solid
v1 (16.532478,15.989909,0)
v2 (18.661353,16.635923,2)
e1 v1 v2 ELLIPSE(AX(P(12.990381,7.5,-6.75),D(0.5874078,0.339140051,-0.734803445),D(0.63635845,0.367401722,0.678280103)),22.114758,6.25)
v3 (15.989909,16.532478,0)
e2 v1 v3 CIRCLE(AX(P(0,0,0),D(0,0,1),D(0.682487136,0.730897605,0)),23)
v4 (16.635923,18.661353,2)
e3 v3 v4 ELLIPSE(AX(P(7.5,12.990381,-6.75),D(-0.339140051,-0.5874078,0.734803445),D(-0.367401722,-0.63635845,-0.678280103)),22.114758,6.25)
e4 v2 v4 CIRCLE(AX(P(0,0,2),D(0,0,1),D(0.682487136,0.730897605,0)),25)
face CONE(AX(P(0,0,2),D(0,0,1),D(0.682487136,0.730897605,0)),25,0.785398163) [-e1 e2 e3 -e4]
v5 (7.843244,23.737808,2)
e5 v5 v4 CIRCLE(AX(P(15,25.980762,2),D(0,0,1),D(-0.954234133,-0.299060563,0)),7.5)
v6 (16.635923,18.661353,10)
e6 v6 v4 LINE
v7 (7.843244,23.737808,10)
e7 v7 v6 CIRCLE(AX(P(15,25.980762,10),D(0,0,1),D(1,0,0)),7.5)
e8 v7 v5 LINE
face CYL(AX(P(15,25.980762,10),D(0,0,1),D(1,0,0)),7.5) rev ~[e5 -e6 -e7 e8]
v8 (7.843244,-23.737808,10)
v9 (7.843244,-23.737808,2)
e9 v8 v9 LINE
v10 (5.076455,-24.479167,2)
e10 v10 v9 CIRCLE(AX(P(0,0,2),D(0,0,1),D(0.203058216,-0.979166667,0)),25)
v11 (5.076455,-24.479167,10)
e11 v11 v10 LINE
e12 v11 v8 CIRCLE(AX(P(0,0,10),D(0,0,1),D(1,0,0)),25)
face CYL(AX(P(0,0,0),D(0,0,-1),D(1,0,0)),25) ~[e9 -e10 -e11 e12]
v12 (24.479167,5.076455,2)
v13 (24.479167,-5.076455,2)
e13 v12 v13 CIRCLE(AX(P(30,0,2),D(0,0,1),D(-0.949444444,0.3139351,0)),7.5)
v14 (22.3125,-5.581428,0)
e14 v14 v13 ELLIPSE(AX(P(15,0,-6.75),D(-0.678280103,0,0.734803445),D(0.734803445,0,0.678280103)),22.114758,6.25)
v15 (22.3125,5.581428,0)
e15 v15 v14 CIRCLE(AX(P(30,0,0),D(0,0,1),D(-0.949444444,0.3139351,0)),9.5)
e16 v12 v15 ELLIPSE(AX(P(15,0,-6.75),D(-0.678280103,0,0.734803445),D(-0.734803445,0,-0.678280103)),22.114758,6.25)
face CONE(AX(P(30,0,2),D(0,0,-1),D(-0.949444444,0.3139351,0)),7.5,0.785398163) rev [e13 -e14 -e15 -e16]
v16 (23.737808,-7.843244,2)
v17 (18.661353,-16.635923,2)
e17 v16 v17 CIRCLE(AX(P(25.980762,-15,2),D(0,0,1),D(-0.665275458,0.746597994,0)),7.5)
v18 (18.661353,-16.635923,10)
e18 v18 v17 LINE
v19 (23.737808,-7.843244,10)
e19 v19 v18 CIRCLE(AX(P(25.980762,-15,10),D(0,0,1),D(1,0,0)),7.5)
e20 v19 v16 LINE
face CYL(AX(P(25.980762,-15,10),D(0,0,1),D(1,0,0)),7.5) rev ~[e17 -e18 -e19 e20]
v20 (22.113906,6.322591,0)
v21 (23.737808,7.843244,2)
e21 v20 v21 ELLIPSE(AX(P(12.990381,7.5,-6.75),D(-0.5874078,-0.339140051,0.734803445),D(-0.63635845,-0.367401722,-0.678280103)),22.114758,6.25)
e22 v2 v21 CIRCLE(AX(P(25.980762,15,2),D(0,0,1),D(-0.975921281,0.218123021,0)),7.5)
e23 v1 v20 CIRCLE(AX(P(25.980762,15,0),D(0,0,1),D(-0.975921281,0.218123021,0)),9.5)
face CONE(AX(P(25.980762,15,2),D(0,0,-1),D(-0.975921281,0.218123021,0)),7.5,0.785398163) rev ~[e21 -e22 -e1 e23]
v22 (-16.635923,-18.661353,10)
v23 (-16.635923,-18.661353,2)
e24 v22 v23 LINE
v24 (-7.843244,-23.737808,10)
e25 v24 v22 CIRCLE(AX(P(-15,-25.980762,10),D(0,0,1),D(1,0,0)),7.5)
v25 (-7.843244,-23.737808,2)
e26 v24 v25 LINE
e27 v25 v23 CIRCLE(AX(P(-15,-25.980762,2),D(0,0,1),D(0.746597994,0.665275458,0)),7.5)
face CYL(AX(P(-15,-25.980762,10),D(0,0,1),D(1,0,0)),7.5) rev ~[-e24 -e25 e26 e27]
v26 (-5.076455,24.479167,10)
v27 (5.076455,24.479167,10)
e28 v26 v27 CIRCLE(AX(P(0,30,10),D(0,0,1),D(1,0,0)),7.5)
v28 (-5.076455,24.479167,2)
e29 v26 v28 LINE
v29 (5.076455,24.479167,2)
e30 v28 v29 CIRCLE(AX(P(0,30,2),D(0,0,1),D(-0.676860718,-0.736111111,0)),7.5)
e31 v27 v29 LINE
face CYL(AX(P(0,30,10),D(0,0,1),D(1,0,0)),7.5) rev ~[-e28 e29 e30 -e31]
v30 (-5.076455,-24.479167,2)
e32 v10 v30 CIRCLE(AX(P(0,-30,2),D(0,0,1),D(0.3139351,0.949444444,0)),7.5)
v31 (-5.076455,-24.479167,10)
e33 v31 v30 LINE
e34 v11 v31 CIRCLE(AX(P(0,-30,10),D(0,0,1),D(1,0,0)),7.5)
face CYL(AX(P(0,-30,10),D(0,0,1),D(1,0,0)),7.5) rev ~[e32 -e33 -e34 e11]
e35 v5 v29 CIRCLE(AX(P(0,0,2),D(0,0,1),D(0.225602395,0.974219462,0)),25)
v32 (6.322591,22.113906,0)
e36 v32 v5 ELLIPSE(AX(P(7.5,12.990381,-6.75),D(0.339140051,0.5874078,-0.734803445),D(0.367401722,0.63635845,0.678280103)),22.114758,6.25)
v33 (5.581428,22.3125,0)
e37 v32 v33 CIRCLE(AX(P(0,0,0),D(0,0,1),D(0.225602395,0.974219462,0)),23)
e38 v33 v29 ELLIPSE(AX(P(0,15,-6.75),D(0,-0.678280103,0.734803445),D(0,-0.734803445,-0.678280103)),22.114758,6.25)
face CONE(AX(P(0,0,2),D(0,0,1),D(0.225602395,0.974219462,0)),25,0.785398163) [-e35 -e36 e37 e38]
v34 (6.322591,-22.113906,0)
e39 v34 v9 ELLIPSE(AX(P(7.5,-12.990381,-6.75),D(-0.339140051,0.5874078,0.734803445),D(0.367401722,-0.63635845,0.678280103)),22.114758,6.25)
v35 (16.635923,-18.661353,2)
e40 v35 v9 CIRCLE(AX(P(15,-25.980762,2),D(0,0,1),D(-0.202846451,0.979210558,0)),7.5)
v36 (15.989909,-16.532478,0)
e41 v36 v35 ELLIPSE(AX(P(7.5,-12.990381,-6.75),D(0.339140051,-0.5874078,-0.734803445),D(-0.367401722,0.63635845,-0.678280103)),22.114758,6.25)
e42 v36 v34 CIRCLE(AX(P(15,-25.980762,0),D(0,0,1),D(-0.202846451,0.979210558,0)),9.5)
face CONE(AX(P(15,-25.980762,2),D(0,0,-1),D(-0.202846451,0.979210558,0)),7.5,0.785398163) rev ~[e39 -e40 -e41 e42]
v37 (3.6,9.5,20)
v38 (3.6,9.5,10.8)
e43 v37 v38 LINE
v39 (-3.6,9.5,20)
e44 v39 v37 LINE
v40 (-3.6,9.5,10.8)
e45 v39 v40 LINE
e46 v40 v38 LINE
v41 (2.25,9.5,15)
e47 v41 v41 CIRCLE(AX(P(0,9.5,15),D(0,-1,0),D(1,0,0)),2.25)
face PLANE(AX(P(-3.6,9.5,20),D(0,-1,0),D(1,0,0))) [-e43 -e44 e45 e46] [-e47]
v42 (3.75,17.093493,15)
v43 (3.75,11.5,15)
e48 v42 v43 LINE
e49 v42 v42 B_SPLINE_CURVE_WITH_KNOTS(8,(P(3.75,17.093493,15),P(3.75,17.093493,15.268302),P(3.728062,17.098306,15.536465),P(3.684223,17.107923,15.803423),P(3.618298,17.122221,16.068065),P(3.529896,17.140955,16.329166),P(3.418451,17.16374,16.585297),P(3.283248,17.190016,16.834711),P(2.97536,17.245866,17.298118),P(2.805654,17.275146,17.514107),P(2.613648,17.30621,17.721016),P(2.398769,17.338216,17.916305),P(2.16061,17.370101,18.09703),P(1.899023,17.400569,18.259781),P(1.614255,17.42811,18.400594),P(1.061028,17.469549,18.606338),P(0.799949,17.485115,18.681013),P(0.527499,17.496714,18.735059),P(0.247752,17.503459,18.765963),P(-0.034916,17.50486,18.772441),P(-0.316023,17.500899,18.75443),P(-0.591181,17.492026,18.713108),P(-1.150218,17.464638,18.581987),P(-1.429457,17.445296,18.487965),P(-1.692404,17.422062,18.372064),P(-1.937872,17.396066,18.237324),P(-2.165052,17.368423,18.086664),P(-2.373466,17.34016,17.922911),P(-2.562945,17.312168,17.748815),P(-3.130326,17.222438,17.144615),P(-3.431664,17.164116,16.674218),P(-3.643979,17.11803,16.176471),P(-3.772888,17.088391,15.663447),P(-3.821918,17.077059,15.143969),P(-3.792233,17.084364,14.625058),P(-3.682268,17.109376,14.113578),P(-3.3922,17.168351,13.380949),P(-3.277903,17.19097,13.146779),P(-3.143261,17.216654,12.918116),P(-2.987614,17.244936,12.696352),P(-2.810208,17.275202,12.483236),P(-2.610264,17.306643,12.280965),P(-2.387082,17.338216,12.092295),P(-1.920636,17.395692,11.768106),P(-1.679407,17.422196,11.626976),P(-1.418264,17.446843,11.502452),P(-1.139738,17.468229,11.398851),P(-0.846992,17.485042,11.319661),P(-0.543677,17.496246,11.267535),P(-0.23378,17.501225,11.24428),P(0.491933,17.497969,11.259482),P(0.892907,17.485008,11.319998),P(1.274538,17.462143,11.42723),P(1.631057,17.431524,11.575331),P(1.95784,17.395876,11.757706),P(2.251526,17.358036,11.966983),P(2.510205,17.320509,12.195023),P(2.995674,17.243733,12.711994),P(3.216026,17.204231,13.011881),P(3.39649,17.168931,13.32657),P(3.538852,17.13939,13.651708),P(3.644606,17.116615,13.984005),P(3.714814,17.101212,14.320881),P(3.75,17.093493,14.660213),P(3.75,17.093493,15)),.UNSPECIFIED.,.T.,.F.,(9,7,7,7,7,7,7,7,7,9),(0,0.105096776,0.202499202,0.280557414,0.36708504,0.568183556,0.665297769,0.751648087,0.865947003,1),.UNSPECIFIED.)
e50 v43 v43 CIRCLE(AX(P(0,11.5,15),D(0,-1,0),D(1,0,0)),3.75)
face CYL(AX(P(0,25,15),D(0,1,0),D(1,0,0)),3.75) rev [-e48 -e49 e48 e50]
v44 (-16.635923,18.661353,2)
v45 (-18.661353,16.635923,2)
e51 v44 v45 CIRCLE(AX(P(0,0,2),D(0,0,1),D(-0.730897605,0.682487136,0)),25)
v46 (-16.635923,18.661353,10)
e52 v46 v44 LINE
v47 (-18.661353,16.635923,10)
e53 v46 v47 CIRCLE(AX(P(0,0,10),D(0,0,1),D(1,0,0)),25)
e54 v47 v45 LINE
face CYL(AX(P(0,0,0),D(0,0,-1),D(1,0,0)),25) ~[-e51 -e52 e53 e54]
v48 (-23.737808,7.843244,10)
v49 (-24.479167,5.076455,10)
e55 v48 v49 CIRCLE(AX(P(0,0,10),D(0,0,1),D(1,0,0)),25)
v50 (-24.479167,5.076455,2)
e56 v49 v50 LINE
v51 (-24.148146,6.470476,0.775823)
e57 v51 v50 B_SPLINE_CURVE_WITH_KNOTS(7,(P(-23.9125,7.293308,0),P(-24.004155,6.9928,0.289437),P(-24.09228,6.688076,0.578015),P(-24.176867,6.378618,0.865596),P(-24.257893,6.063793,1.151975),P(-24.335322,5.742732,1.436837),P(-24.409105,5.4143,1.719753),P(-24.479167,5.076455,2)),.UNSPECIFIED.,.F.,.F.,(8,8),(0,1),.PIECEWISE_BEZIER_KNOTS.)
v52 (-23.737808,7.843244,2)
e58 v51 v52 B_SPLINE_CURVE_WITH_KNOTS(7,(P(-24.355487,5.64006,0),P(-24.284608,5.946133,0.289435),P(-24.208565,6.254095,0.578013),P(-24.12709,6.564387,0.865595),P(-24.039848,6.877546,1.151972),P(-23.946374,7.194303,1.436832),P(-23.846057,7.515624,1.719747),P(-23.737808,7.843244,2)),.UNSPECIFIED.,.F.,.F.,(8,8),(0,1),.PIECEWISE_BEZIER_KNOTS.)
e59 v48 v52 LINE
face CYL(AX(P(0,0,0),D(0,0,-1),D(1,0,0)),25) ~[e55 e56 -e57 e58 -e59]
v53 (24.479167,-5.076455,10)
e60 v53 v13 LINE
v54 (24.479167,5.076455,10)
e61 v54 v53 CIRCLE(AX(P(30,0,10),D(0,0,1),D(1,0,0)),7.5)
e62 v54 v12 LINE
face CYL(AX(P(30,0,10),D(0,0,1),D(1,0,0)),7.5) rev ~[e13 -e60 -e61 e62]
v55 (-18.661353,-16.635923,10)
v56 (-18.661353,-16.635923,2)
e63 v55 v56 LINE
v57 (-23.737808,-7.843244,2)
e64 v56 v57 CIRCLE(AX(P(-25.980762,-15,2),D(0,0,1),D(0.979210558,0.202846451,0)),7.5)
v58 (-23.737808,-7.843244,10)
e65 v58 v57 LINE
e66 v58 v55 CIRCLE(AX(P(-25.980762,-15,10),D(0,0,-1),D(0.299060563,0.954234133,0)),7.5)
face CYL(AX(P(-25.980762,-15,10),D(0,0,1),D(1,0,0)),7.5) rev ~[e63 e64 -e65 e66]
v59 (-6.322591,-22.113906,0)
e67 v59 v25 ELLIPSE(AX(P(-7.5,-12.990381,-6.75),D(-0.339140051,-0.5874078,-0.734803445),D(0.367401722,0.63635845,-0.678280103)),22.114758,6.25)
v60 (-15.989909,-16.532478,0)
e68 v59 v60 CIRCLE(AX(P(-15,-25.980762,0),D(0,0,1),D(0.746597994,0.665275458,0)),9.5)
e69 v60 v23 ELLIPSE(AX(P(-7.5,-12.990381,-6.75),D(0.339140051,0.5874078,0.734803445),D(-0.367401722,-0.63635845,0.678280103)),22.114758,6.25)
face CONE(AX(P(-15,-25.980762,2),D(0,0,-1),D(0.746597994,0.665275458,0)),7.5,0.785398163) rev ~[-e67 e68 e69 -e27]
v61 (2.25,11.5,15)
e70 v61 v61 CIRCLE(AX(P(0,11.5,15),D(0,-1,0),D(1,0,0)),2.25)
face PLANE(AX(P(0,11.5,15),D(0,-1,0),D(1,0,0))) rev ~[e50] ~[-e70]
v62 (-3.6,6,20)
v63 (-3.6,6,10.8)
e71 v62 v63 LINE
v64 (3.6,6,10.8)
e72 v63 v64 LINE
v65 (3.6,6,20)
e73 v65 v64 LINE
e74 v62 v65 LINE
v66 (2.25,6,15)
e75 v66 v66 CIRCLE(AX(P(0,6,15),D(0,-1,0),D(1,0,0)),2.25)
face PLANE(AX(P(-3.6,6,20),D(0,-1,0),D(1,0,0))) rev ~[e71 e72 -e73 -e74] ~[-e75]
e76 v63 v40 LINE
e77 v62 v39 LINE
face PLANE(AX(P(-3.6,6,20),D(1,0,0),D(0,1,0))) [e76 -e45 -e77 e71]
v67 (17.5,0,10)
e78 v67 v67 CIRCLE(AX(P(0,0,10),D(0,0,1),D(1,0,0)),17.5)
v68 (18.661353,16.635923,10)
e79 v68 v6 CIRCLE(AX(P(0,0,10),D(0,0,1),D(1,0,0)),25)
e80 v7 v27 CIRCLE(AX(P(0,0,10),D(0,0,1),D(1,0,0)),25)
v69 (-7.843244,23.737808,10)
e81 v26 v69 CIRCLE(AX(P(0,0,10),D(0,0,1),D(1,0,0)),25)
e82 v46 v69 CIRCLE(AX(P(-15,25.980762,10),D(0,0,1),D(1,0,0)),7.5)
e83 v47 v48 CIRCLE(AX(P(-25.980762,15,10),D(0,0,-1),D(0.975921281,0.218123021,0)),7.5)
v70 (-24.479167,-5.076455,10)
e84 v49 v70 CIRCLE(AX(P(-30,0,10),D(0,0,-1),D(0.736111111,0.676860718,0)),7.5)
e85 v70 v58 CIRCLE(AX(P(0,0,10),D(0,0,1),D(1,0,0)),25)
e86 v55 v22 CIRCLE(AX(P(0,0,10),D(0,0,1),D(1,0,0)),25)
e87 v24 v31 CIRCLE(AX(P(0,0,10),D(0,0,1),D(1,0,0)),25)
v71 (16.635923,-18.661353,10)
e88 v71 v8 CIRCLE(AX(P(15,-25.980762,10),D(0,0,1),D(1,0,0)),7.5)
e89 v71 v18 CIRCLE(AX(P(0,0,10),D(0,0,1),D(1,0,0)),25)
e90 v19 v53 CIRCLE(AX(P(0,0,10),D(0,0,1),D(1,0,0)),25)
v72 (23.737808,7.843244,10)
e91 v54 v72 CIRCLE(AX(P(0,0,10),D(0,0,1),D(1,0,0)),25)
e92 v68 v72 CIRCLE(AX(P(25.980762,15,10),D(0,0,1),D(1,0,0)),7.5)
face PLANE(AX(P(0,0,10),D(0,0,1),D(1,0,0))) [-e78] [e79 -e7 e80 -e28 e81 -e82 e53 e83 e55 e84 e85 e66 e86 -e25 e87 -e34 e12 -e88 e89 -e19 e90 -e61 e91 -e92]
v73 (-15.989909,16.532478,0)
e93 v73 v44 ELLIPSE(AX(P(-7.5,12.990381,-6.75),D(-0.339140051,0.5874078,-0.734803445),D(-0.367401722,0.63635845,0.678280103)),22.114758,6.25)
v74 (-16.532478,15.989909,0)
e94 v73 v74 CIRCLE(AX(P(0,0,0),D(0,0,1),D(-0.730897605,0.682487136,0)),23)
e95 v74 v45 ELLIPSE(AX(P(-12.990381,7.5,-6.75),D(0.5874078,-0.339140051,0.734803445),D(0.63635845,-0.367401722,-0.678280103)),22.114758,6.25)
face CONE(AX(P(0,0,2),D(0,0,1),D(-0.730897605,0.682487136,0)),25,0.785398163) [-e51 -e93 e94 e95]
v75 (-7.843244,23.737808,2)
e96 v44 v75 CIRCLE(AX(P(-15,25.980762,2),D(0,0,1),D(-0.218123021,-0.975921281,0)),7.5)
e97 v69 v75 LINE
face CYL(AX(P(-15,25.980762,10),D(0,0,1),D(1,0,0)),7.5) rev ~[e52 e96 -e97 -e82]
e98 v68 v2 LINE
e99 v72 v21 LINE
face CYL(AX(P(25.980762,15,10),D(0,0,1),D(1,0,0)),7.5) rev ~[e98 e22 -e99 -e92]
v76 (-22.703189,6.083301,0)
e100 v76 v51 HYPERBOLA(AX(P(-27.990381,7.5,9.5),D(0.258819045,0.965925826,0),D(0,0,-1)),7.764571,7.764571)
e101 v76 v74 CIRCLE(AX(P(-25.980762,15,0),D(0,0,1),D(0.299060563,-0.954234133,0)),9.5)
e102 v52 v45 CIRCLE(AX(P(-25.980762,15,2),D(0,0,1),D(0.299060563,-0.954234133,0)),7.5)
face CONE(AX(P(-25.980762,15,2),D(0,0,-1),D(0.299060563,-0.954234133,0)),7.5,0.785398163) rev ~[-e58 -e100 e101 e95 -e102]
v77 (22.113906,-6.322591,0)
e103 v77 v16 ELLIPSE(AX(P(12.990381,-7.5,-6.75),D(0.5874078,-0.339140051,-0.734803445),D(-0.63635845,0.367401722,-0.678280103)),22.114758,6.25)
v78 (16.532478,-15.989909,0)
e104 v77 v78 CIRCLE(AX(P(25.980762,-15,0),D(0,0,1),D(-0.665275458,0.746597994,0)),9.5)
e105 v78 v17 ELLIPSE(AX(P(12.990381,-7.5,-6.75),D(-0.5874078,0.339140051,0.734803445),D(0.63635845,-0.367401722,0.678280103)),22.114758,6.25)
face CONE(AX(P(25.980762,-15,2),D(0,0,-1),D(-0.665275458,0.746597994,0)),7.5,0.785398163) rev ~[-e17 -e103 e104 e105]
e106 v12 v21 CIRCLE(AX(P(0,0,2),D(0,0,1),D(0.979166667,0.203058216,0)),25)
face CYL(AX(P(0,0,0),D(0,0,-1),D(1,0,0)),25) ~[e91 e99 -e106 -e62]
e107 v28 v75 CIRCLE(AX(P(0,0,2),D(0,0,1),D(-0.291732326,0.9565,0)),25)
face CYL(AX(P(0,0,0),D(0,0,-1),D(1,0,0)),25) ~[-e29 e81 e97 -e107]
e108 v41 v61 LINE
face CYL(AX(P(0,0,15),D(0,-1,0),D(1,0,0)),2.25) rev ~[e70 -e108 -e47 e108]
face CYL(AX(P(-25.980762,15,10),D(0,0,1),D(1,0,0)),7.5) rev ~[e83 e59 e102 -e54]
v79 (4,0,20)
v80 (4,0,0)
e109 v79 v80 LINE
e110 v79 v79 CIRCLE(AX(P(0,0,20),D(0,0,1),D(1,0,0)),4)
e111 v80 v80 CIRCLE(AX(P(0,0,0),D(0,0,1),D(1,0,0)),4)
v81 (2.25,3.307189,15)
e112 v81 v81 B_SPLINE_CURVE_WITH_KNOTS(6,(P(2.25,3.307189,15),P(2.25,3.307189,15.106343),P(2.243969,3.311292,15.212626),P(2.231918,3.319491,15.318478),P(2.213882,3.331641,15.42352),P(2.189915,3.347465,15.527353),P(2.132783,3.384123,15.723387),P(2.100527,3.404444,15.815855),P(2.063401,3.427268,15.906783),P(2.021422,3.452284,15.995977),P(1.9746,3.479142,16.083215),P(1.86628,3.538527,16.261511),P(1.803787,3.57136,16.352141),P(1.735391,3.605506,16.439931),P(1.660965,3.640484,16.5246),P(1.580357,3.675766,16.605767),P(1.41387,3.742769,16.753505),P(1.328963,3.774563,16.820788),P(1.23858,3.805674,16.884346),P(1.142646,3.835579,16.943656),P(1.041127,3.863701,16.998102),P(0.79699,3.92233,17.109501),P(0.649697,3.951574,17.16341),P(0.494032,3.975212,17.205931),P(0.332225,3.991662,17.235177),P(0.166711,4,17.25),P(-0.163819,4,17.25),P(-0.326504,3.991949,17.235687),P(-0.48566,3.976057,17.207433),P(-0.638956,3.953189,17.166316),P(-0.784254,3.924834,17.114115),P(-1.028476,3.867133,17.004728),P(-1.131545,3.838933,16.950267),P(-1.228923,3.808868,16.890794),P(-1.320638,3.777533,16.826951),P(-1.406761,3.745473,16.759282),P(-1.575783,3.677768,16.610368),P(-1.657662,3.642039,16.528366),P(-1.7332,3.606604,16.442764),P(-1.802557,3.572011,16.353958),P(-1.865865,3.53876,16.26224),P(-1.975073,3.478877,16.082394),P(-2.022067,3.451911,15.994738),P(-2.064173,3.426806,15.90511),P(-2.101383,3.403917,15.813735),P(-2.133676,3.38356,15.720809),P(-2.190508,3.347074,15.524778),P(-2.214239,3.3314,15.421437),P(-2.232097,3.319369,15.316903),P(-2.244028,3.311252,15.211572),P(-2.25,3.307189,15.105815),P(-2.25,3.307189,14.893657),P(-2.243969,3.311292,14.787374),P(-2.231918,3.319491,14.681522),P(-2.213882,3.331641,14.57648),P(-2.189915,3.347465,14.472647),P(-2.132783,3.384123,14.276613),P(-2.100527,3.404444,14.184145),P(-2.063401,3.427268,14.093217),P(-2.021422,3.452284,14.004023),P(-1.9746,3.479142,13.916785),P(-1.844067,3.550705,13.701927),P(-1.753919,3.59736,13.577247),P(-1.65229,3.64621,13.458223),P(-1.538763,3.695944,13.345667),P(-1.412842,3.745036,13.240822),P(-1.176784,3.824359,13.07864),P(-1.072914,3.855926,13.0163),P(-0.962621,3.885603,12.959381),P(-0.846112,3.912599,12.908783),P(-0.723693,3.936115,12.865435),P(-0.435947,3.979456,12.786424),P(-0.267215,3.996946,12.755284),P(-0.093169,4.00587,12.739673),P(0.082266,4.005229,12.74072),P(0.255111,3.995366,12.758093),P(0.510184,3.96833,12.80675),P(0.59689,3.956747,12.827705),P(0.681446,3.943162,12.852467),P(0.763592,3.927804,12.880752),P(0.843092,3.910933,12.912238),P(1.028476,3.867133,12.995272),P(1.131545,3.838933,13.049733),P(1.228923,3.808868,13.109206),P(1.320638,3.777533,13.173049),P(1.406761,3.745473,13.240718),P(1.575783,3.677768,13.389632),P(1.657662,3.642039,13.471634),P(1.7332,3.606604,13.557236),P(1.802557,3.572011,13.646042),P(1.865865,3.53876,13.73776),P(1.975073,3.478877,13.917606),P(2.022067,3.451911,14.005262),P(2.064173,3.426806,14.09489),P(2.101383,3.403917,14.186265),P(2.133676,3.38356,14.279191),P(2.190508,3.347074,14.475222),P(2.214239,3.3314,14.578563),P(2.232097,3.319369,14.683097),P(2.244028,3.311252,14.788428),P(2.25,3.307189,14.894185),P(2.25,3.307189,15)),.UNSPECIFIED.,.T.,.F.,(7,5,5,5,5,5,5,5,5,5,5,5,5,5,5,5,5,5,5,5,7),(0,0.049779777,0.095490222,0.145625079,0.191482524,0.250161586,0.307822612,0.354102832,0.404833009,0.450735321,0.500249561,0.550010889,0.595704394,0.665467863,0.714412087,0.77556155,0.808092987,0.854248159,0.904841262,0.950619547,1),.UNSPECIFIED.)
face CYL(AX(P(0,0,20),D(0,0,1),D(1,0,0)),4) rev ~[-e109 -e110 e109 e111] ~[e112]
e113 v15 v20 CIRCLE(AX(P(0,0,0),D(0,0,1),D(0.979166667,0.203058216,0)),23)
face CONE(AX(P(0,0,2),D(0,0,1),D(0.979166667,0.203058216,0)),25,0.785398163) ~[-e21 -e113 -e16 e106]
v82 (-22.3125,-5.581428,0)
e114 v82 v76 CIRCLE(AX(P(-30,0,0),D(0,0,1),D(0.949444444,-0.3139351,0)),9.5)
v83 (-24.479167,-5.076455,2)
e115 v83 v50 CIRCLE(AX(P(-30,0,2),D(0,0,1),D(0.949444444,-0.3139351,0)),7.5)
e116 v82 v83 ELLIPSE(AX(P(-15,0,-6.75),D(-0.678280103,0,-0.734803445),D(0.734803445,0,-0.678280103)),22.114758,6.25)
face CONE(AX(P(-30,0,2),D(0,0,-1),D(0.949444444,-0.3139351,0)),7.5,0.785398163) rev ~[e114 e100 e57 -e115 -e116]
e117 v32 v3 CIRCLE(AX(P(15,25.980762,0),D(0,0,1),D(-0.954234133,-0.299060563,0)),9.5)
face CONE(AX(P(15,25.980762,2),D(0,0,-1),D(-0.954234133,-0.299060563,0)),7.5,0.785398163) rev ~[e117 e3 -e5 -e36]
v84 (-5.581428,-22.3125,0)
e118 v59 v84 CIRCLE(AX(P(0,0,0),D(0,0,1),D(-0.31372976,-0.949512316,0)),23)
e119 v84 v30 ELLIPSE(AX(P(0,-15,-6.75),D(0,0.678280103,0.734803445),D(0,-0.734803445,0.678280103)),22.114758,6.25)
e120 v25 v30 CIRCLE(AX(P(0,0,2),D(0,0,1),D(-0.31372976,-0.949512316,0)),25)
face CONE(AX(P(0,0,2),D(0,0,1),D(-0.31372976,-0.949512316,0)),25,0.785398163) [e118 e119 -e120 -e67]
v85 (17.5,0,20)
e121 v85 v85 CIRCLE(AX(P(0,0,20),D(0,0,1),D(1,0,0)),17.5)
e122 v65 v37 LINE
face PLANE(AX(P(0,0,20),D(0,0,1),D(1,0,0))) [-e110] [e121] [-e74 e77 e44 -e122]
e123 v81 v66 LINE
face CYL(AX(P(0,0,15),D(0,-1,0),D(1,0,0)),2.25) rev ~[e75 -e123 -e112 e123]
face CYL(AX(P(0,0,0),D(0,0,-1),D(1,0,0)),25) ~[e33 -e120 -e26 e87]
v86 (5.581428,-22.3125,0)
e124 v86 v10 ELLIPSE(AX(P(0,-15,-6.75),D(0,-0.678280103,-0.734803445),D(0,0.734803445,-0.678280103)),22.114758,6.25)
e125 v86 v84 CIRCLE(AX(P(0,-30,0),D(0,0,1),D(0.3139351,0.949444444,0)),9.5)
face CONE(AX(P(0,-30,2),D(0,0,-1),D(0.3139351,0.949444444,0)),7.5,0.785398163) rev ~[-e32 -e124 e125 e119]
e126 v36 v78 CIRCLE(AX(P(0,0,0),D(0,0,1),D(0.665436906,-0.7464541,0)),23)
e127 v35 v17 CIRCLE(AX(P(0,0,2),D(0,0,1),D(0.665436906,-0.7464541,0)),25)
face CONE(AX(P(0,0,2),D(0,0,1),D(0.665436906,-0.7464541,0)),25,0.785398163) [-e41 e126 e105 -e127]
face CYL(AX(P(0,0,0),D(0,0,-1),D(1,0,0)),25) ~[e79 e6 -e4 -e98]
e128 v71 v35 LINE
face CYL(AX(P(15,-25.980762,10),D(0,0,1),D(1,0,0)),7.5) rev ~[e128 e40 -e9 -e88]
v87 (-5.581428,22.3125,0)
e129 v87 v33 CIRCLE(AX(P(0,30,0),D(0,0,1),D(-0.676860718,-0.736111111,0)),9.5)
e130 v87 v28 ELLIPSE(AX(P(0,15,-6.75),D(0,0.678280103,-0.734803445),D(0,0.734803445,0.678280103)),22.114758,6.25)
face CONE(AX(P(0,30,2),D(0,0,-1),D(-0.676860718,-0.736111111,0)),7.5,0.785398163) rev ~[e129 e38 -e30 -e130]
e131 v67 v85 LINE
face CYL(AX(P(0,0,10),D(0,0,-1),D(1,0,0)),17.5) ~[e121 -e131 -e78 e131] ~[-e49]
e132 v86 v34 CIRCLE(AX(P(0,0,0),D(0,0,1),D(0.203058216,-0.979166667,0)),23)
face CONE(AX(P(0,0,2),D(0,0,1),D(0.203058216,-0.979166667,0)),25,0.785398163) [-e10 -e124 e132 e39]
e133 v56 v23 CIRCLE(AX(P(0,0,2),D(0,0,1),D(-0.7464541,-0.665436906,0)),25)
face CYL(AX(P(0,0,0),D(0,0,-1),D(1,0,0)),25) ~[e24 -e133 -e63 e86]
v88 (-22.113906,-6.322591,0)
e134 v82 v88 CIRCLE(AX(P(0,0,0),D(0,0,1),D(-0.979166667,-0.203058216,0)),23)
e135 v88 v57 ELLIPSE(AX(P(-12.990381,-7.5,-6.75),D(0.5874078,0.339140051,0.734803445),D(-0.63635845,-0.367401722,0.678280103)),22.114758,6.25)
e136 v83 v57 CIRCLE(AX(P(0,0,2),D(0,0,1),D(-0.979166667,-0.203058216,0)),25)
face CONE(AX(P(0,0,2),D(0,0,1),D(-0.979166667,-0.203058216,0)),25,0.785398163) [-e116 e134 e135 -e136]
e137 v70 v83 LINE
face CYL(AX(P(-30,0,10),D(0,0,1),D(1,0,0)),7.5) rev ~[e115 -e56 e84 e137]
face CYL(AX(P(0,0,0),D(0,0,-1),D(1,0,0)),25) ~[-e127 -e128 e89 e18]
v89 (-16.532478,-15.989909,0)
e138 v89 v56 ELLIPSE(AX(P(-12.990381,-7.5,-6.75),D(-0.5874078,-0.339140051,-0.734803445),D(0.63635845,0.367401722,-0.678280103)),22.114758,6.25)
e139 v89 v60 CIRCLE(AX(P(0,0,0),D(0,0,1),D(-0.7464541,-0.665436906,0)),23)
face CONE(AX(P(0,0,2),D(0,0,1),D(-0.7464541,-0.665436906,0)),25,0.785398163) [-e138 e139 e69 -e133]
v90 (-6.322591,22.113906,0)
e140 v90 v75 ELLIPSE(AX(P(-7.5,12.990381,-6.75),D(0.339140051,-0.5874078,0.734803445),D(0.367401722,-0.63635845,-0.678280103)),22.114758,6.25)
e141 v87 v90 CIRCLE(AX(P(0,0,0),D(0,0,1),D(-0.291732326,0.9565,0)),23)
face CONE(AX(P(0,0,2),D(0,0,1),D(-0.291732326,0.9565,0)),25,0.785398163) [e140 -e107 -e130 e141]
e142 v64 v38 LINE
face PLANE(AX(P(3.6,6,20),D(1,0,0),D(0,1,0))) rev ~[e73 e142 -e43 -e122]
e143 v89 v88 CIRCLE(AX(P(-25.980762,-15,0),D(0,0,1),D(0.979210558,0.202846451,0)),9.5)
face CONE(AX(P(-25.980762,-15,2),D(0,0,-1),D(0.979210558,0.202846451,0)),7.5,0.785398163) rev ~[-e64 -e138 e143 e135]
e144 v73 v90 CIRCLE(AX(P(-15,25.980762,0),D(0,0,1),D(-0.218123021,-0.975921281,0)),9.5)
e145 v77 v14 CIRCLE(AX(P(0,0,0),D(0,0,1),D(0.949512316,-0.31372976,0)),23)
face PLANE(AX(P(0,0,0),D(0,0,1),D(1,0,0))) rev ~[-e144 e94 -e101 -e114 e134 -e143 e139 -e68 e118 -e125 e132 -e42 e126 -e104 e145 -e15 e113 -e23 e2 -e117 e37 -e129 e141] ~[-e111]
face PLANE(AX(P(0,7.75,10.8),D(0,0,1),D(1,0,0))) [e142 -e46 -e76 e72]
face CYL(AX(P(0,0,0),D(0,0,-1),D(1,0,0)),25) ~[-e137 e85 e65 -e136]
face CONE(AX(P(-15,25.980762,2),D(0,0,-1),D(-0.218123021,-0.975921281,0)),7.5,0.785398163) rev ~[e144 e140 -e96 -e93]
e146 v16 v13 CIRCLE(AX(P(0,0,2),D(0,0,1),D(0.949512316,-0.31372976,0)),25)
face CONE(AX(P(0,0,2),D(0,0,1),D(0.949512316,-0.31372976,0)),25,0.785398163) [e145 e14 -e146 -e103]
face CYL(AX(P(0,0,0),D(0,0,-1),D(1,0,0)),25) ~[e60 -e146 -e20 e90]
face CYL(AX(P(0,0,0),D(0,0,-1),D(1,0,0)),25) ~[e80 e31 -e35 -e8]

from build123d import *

# Parameters (mm, degrees)
F0_R         = 25
F1_DEPTH     = 10
F2_R         = 7.5
F3_DEPTH     = 10.001
F4_R         = 17.5
F5_DEPTH     = 10
F6_R         = 4
F7_DEPTH     = 20
F8_R         = 2.25
F9_DEPTH     = 24.4801666667
F10_W        = 7.2
F10_H        = 3.5
F11_DEPTH    = 9.2
F13_R        = 3.75
F14_DEPTH    = 13.5
F15_C1_SIZE  = 2
F15_C2_SIZE  = 2
F15_C3_SIZE  = 2
F15_C4_SIZE  = 2
F15_C5_SIZE  = 2
F15_C6_SIZE  = 2
F15_C7_SIZE  = 2
F15_C8_SIZE  = 2
F15_C9_SIZE  = 2
F15_C10_SIZE = 2
F15_C11_SIZE = 2
F15_C12_SIZE = 2
F15_C13_SIZE = 2
F15_C14_SIZE = 2
F15_C15_SIZE = 2
F15_C16_SIZE = 2
F15_C17_SIZE = 2
F15_C18_SIZE = 2
F15_C19_SIZE = 2
F15_C20_SIZE = 2
F15_C21_SIZE = 2
F15_C22_SIZE = 2
F15_C23_SIZE = 2


with BuildPart() as f1:
    # F0 (on Top) → F1 (new body)
    with BuildSketch(Plane.XY):
        Circle(F0_R)
    extrude(amount=F1_DEPTH)

    # F2 (on face) → F3 (cut, through all)
    with BuildSketch(Plane.XY.offset(10)):
        with Locations((0, 30)):
            Circle(F2_R)
        with Locations((-15, 25.9807621135)):
            Circle(F2_R)
        with Locations((-25.9807621135, 15)):
            Circle(F2_R)
        with Locations((-30, 0)):
            Circle(F2_R)
        with Locations((-25.9807621135, -15)):
            Circle(F2_R)
        with Locations((-15, -25.9807621135)):
            Circle(F2_R)
        with Locations((0, -30)):
            Circle(F2_R)
        with Locations((15, -25.9807621135)):
            Circle(F2_R)
        with Locations((25.9807621135, -15)):
            Circle(F2_R)
        with Locations((30, 0)):
            Circle(F2_R)
        with Locations((25.9807621135, 15)):
            Circle(F2_R)
        with Locations((15, 25.9807621135)):
            Circle(F2_R)
    extrude(amount=-F3_DEPTH, mode=Mode.SUBTRACT)

    # F4 (on face) → F5 (join)
    with BuildSketch(Plane.XY.offset(10)):
        Circle(F4_R)
    extrude(amount=F5_DEPTH)

    # F6 (on face) → F7 (cut, through all)
    with BuildSketch(Plane.XY.offset(20)):
        Circle(F6_R)
    extrude(amount=-F7_DEPTH, mode=Mode.SUBTRACT)

    # F8 (on Front) → F9 (cut, through all)
    with BuildSketch(Plane.XZ):
        with Locations((0, 15)):
            Circle(F8_R)
    extrude(amount=-F9_DEPTH, mode=Mode.SUBTRACT)

    # F10 (on face) → F11 (cut)
    with BuildSketch(Plane.XY.offset(20)):
        with Locations((0, 7.75)):
            Rectangle(F10_W, F10_H)
    extrude(amount=-F11_DEPTH, mode=Mode.SUBTRACT)

    # F13 (on offset) → F14 (cut, through all)
    with BuildSketch(Plane.XZ.offset(-25)):
        with Locations((0, 15)):
            Circle(F13_R)
    extrude(amount=F14_DEPTH, mode=Mode.SUBTRACT)

    # F15: chamfer of 2 on 23 edges, made by hand

    # F15_c1
    f15_c1_edges = [f1.edges().sort_by_distance(p)[0] for p in [
        (24.1481456572, 6.4704761276, 0),
    ]]
    chamfer(f15_c1_edges, length=F15_C1_SIZE)

    # F15_c2
    f15_c2_edges = [f1.edges().sort_by_distance(p)[0] for p in [
        (22.6680317958, -1.5786837087, 0),
    ]]
    chamfer(f15_c2_edges, length=F15_C2_SIZE)

    # F15_c3
    f15_c3_edges = [f1.edges().sort_by_distance(p)[0] for p in [
        (23.8267406055, -7.5687800944, 0),
    ]]
    chamfer(f15_c3_edges, length=F15_C3_SIZE)

    # F15_c4
    f15_c4_edges = [f1.edges().sort_by_distance(p)[0] for p in [
        (18.8417495346, 12.7011960942, 0),
    ]]
    chamfer(f15_c4_edges, length=F15_C4_SIZE)

    # F15_c5
    f15_c5_edges = [f1.edges().sort_by_distance(p)[0] for p in [
        (18.8417495346, -12.7011960942, 0),
    ]]
    chamfer(f15_c5_edges, length=F15_C5_SIZE)

    # F15_c6
    f15_c6_edges = [f1.edges().sort_by_distance(p)[0] for p in [
        (16.8501726066, 18.4681261401, 0),
    ]]
    chamfer(f15_c6_edges, length=F15_C6_SIZE)

    # F15_c7
    f15_c7_edges = [f1.edges().sort_by_distance(p)[0] for p in [
        (16.8501726066, -18.4681261401, 0),
    ]]
    chamfer(f15_c7_edges, length=F15_C7_SIZE)

    # F15_c8
    f15_c8_edges = [f1.edges().sort_by_distance(p)[0] for p in [
        (9.9668357016, 20.4204332433, 0),
    ]]
    chamfer(f15_c8_edges, length=F15_C8_SIZE)

    # F15_c9
    f15_c9_edges = [f1.edges().sort_by_distance(p)[0] for p in [
        (9.9668357016, -20.4204332433, 0),
    ]]
    chamfer(f15_c9_edges, length=F15_C9_SIZE)

    # F15_c10
    f15_c10_edges = [f1.edges().sort_by_distance(p)[0] for p in [
        (5.3586144654, 24.418952701, 0),
    ]]
    chamfer(f15_c10_edges, length=F15_C10_SIZE)

    # F15_c11
    f15_c11_edges = [f1.edges().sort_by_distance(p)[0] for p in [
        (5.3586144654, -24.418952701, 0),
    ]]
    chamfer(f15_c11_edges, length=F15_C11_SIZE)

    # F15_c12
    f15_c12_edges = [f1.edges().sort_by_distance(p)[0] for p in [
        (-1.5786837087, 22.6680317958, 0),
    ]]
    chamfer(f15_c12_edges, length=F15_C12_SIZE)

    # F15_c13
    f15_c13_edges = [f1.edges().sort_by_distance(p)[0] for p in [
        (-1.5786837087, -22.6680317958, 0),
    ]]
    chamfer(f15_c13_edges, length=F15_C13_SIZE)

    # F15_c14
    f15_c14_edges = [f1.edges().sort_by_distance(p)[0] for p in [
        (-7.5687800944, 23.8267406055, 0),
    ]]
    chamfer(f15_c14_edges, length=F15_C14_SIZE)

    # F15_c15
    f15_c15_edges = [f1.edges().sort_by_distance(p)[0] for p in [
        (-7.5687800944, -23.8267406055, 0),
    ]]
    chamfer(f15_c15_edges, length=F15_C15_SIZE)

    # F15_c16
    f15_c16_edges = [f1.edges().sort_by_distance(p)[0] for p in [
        (-12.7011960942, 18.8417495346, 0),
    ]]
    chamfer(f15_c16_edges, length=F15_C16_SIZE)

    # F15_c17
    f15_c17_edges = [f1.edges().sort_by_distance(p)[0] for p in [
        (-12.7011960942, -18.8417495346, 0),
    ]]
    chamfer(f15_c17_edges, length=F15_C17_SIZE)

    # F15_c18
    f15_c18_edges = [f1.edges().sort_by_distance(p)[0] for p in [
        (-18.4681261401, 16.8501726066, 0),
    ]]
    chamfer(f15_c18_edges, length=F15_C18_SIZE)

    # F15_c19
    f15_c19_edges = [f1.edges().sort_by_distance(p)[0] for p in [
        (-18.4681261401, -16.8501726066, 0),
    ]]
    chamfer(f15_c19_edges, length=F15_C19_SIZE)

    # F15_c20
    f15_c20_edges = [f1.edges().sort_by_distance(p)[0] for p in [
        (-20.4204332433, 9.9668357016, 0),
    ]]
    chamfer(f15_c20_edges, length=F15_C20_SIZE)

    # F15_c21
    f15_c21_edges = [f1.edges().sort_by_distance(p)[0] for p in [
        (-20.4204332433, -9.9668357016, 0),
    ]]
    chamfer(f15_c21_edges, length=F15_C21_SIZE)

    # F15_c22
    f15_c22_edges = [f1.edges().sort_by_distance(p)[0] for p in [
        (-24.418952701, -5.3586144654, 0),
    ]]
    chamfer(f15_c22_edges, length=F15_C22_SIZE)

    # F15_c23
    f15_c23_edges = [f1.edges().sort_by_distance(p)[0] for p in [
        (-22.6680317958, 1.5786837087, 0),
    ]]
    chamfer(f15_c23_edges, length=F15_C23_SIZE)


solid = f1.part
